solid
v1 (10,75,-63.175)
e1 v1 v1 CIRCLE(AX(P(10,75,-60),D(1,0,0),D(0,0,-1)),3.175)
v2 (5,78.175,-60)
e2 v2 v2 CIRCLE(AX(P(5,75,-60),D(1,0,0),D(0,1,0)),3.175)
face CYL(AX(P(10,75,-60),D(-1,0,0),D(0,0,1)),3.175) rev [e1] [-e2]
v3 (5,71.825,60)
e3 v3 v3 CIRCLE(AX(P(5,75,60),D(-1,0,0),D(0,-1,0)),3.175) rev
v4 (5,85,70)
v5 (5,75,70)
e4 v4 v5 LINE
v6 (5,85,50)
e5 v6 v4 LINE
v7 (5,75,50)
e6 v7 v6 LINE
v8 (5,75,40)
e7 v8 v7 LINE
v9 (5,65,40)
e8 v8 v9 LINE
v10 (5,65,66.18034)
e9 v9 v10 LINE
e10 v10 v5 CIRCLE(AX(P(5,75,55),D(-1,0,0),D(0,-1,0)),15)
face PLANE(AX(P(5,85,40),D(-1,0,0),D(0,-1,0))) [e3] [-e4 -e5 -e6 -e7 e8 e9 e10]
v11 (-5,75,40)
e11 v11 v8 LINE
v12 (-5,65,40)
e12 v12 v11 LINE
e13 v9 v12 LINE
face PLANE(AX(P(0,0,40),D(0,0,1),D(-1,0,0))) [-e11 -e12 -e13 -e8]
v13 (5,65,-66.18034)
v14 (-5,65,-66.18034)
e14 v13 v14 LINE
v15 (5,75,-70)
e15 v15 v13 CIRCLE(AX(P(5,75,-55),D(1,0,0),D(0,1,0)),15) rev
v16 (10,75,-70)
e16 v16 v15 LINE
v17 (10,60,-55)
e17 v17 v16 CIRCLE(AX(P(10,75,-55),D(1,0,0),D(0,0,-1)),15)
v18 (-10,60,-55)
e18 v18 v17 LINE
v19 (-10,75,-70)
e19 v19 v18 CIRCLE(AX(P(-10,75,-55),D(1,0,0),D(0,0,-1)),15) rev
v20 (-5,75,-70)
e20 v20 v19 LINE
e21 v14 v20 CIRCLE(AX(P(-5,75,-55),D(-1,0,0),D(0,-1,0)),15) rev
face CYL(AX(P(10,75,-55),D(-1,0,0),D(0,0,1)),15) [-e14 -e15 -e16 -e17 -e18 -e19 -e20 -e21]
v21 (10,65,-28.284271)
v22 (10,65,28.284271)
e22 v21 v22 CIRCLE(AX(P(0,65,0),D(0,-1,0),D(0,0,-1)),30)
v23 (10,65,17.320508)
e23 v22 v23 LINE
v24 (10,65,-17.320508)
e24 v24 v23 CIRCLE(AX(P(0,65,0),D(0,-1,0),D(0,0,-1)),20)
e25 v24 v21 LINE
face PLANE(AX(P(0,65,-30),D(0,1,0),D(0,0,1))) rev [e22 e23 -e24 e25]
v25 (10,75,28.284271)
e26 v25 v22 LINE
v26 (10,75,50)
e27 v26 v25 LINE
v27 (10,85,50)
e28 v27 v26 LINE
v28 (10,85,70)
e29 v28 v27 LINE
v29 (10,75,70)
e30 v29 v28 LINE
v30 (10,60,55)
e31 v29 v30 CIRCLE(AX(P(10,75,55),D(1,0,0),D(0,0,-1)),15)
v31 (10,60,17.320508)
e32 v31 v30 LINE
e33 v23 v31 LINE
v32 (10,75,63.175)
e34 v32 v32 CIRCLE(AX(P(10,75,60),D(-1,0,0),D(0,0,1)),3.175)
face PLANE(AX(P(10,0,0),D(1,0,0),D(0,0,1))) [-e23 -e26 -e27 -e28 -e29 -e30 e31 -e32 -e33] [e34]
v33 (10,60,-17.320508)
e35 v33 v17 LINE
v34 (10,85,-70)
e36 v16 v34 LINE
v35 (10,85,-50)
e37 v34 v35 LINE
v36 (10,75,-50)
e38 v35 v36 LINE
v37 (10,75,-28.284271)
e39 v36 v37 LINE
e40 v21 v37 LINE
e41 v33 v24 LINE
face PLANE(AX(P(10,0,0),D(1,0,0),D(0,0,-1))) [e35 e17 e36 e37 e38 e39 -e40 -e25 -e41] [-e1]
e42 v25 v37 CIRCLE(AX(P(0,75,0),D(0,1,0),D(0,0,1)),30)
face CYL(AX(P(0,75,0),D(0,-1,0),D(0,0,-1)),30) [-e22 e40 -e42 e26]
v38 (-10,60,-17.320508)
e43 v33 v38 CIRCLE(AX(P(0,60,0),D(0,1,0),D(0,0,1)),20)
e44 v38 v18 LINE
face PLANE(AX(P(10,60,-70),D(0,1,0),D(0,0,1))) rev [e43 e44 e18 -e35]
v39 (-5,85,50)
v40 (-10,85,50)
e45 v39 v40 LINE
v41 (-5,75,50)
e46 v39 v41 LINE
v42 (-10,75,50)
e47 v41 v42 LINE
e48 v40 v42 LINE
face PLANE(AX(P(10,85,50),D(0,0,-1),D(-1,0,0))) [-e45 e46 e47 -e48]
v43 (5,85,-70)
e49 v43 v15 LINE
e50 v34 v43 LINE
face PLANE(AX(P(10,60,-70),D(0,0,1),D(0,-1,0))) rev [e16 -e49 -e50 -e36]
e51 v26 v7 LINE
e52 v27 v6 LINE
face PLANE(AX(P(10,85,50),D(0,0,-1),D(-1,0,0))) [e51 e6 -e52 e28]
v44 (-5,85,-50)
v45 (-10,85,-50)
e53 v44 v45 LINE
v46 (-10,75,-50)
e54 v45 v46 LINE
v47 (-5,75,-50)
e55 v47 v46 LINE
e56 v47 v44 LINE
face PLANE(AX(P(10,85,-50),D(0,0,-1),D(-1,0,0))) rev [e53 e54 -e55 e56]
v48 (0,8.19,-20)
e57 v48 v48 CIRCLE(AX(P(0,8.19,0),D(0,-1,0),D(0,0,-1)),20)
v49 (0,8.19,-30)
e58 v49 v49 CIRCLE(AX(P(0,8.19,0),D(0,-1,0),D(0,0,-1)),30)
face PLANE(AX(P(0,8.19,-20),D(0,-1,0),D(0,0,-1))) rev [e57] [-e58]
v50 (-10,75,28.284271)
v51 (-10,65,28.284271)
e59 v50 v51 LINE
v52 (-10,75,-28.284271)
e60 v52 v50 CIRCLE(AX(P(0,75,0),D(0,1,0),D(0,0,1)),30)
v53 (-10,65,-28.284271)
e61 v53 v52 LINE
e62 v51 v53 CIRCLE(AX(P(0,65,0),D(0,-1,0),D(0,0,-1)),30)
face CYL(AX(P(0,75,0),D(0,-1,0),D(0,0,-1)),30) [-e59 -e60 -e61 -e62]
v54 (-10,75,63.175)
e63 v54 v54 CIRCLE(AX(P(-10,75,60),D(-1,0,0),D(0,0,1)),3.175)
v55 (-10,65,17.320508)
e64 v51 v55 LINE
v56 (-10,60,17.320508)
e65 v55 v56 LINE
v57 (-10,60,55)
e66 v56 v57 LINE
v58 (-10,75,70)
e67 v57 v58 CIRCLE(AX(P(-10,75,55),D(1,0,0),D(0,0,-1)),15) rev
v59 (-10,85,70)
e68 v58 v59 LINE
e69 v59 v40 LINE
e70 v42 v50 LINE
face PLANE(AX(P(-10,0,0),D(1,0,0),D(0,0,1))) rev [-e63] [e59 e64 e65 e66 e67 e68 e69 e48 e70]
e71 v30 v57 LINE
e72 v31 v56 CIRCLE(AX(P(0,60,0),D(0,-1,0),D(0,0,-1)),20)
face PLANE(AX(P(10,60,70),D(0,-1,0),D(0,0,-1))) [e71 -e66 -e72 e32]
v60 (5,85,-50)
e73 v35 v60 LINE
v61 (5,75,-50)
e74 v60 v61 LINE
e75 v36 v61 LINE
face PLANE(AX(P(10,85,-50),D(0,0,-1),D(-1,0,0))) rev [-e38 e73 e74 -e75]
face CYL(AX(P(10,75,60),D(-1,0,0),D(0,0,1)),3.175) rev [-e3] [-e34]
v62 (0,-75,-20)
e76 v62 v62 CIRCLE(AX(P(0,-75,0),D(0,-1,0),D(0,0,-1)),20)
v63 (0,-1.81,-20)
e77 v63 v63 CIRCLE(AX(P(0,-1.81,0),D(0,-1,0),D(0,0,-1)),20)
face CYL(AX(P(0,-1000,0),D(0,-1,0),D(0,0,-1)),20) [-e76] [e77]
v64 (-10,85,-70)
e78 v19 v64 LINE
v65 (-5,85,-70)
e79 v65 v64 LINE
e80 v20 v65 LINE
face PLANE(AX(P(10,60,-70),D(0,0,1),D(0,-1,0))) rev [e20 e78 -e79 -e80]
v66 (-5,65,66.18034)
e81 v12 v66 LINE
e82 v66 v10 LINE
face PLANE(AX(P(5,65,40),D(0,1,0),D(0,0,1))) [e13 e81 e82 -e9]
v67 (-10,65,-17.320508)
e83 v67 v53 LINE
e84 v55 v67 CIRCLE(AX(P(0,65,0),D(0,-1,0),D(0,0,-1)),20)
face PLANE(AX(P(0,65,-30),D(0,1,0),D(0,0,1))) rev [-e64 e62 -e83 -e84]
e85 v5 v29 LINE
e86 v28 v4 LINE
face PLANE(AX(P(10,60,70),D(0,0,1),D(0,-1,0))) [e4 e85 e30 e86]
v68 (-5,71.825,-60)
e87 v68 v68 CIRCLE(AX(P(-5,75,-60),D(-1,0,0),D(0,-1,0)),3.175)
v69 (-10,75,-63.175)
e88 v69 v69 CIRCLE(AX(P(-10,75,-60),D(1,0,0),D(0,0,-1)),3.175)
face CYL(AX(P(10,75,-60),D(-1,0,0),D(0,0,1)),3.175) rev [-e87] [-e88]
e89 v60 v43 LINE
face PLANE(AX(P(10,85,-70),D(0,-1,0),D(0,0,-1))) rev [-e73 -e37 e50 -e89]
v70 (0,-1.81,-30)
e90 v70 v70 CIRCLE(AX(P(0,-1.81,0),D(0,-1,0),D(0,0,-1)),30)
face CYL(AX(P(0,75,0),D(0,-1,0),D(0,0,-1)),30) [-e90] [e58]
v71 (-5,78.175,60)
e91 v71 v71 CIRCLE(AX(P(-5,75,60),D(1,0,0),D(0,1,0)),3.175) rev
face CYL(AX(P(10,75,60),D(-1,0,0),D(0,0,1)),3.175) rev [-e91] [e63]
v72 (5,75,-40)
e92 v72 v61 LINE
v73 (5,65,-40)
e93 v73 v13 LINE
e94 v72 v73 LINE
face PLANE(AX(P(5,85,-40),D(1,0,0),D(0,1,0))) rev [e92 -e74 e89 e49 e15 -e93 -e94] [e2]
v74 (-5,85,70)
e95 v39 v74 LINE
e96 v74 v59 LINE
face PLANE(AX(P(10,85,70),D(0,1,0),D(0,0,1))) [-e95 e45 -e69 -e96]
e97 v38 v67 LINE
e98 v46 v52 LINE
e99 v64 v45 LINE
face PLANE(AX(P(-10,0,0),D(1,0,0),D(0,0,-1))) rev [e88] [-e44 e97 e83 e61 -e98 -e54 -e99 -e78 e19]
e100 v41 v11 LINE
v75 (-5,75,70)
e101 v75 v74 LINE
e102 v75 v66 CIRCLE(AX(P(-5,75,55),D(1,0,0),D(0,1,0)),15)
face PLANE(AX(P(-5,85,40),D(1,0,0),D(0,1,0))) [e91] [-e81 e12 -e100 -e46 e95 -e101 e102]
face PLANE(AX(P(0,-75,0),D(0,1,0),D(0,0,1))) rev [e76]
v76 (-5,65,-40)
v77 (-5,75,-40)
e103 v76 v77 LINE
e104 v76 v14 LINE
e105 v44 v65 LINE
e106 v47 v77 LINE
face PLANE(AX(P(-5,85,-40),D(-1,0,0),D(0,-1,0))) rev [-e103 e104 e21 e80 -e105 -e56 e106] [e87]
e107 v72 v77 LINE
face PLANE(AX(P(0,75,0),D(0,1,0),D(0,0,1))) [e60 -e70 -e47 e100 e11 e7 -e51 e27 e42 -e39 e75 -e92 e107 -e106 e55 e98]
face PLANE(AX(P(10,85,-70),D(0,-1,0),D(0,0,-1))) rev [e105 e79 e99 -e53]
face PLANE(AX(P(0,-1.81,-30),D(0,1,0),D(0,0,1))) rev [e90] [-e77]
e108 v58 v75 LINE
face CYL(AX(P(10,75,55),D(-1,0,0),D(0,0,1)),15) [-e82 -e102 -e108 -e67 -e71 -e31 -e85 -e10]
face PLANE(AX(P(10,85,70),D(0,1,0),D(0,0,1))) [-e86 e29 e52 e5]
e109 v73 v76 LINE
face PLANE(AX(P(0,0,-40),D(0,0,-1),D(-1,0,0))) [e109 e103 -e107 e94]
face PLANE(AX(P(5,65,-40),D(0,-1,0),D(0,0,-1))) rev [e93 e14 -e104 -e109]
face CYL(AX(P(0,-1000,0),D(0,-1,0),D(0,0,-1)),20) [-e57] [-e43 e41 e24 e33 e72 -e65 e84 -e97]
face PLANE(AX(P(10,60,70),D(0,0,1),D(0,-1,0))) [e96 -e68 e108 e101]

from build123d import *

# Parameters (mm, degrees)
SKETCH1_R            = 30
BOSS_EXTRUDE1_DEPTH  = 75
SKETCH2_W            = 10
SKETCH2_H            = 56.81
SKETCH2_H_2          = 73.19
SKETCH3_R            = 3.175
BOSS_EXTRUDE2_DEPTH  = 10
SKETCH5_W            = 10
SKETCH5_H            = 20
CUT_EXTRUDE2_DEPTH   = 30
FILLET1_R            = 15
FILLET1_OF_MIRROR1_R = 15


with BuildPart() as part:
    # Sketch1 → Boss-Extrude1 (new, symmetric)
    with BuildSketch(Plane(origin=(0, 0, 0), x_dir=(1, 0, 0), z_dir=(0, 1, 0))):
        with Locations(Location((0, 0, 0), (0, 0, 270))):
            Circle(SKETCH1_R)
    extrude(amount=BOSS_EXTRUDE1_DEPTH, both=True)

    # Sketch2 → Cut-Revolve1 (revolve, cut)
    with BuildSketch(Plane(origin=(0, 0, 0), x_dir=(0, 0, -1), z_dir=(1, 0, 0))):
        with Locations((25, 36.595)):
            Rectangle(SKETCH2_W, SKETCH2_H)
        with Locations((25, -38.405)):
            Rectangle(SKETCH2_W, SKETCH2_H_2)
    revolve(axis=Axis((0, -1000, 0), (0, 1, 0)), mode=Mode.SUBTRACT)

    # Sketch3 → Boss-Extrude2 (add, symmetric)
    with BuildSketch(Plane(origin=(0, 0, 0), x_dir=(0, 0, -1), z_dir=(1, 0, 0))):
        Polygon((0, 75), (0, 60), (70, 60), (70, 85), (50, 85), (50, 75), align=None)
        with Locations((60, 75)):
            Circle(SKETCH3_R, mode=Mode.SUBTRACT)
    boss_extrude2 = extrude(amount=BOSS_EXTRUDE2_DEPTH, both=True)

    # Sketch5 → Cut-Extrude2 (cut)
    with BuildSketch(Plane(origin=(0, 0, -70), x_dir=(-1, 0, 0), z_dir=(0, 0, -1))):
        with Locations((0, 75)):
            Rectangle(SKETCH5_W, SKETCH5_H)
    cut_extrude2 = extrude(amount=-CUT_EXTRUDE2_DEPTH, mode=Mode.SUBTRACT)

    # Fillet1
    # the kernel refuses this fillet: 15 mm, written as the material it takes off along each edge
    with BuildSketch(Plane(origin=(-47.5, 60, -70), x_dir=(0, 0, 1), z_dir=(1, 0, 0))) as fillet1_piece_1:
        with BuildLine():
            CenterArc((FILLET1_R, -FILLET1_R), FILLET1_R, 90, 90)
            Line((0, -FILLET1_R), (0, 0))
            Line((0, 0), (FILLET1_R, 0))
        make_face()
    extrude(amount=95, mode=Mode.SUBTRACT)

    # Mirror1: Boss-Extrude2, Cut-Extrude2 across plane
    add(boss_extrude2.mirror(Plane.XY))
    add(cut_extrude2.mirror(Plane.XY), mode=Mode.SUBTRACT)

    # Fillet1 of Mirror1
    # the kernel refuses this fillet: 15 mm, written as the material it takes off along each edge
    with BuildSketch(Plane(origin=(-47.5, 60, 70), x_dir=(0, 0, -1), z_dir=(1, 0, 0))) as fillet1_of_mirror1_piece_1:
        with BuildLine():
            CenterArc((FILLET1_OF_MIRROR1_R, FILLET1_OF_MIRROR1_R), FILLET1_OF_MIRROR1_R, 180, 90)
            Line((0, FILLET1_OF_MIRROR1_R), (0, 0))
            Line((0, 0), (FILLET1_OF_MIRROR1_R, 0))
        make_face()
    extrude(amount=95, mode=Mode.SUBTRACT)


solid = part.part
